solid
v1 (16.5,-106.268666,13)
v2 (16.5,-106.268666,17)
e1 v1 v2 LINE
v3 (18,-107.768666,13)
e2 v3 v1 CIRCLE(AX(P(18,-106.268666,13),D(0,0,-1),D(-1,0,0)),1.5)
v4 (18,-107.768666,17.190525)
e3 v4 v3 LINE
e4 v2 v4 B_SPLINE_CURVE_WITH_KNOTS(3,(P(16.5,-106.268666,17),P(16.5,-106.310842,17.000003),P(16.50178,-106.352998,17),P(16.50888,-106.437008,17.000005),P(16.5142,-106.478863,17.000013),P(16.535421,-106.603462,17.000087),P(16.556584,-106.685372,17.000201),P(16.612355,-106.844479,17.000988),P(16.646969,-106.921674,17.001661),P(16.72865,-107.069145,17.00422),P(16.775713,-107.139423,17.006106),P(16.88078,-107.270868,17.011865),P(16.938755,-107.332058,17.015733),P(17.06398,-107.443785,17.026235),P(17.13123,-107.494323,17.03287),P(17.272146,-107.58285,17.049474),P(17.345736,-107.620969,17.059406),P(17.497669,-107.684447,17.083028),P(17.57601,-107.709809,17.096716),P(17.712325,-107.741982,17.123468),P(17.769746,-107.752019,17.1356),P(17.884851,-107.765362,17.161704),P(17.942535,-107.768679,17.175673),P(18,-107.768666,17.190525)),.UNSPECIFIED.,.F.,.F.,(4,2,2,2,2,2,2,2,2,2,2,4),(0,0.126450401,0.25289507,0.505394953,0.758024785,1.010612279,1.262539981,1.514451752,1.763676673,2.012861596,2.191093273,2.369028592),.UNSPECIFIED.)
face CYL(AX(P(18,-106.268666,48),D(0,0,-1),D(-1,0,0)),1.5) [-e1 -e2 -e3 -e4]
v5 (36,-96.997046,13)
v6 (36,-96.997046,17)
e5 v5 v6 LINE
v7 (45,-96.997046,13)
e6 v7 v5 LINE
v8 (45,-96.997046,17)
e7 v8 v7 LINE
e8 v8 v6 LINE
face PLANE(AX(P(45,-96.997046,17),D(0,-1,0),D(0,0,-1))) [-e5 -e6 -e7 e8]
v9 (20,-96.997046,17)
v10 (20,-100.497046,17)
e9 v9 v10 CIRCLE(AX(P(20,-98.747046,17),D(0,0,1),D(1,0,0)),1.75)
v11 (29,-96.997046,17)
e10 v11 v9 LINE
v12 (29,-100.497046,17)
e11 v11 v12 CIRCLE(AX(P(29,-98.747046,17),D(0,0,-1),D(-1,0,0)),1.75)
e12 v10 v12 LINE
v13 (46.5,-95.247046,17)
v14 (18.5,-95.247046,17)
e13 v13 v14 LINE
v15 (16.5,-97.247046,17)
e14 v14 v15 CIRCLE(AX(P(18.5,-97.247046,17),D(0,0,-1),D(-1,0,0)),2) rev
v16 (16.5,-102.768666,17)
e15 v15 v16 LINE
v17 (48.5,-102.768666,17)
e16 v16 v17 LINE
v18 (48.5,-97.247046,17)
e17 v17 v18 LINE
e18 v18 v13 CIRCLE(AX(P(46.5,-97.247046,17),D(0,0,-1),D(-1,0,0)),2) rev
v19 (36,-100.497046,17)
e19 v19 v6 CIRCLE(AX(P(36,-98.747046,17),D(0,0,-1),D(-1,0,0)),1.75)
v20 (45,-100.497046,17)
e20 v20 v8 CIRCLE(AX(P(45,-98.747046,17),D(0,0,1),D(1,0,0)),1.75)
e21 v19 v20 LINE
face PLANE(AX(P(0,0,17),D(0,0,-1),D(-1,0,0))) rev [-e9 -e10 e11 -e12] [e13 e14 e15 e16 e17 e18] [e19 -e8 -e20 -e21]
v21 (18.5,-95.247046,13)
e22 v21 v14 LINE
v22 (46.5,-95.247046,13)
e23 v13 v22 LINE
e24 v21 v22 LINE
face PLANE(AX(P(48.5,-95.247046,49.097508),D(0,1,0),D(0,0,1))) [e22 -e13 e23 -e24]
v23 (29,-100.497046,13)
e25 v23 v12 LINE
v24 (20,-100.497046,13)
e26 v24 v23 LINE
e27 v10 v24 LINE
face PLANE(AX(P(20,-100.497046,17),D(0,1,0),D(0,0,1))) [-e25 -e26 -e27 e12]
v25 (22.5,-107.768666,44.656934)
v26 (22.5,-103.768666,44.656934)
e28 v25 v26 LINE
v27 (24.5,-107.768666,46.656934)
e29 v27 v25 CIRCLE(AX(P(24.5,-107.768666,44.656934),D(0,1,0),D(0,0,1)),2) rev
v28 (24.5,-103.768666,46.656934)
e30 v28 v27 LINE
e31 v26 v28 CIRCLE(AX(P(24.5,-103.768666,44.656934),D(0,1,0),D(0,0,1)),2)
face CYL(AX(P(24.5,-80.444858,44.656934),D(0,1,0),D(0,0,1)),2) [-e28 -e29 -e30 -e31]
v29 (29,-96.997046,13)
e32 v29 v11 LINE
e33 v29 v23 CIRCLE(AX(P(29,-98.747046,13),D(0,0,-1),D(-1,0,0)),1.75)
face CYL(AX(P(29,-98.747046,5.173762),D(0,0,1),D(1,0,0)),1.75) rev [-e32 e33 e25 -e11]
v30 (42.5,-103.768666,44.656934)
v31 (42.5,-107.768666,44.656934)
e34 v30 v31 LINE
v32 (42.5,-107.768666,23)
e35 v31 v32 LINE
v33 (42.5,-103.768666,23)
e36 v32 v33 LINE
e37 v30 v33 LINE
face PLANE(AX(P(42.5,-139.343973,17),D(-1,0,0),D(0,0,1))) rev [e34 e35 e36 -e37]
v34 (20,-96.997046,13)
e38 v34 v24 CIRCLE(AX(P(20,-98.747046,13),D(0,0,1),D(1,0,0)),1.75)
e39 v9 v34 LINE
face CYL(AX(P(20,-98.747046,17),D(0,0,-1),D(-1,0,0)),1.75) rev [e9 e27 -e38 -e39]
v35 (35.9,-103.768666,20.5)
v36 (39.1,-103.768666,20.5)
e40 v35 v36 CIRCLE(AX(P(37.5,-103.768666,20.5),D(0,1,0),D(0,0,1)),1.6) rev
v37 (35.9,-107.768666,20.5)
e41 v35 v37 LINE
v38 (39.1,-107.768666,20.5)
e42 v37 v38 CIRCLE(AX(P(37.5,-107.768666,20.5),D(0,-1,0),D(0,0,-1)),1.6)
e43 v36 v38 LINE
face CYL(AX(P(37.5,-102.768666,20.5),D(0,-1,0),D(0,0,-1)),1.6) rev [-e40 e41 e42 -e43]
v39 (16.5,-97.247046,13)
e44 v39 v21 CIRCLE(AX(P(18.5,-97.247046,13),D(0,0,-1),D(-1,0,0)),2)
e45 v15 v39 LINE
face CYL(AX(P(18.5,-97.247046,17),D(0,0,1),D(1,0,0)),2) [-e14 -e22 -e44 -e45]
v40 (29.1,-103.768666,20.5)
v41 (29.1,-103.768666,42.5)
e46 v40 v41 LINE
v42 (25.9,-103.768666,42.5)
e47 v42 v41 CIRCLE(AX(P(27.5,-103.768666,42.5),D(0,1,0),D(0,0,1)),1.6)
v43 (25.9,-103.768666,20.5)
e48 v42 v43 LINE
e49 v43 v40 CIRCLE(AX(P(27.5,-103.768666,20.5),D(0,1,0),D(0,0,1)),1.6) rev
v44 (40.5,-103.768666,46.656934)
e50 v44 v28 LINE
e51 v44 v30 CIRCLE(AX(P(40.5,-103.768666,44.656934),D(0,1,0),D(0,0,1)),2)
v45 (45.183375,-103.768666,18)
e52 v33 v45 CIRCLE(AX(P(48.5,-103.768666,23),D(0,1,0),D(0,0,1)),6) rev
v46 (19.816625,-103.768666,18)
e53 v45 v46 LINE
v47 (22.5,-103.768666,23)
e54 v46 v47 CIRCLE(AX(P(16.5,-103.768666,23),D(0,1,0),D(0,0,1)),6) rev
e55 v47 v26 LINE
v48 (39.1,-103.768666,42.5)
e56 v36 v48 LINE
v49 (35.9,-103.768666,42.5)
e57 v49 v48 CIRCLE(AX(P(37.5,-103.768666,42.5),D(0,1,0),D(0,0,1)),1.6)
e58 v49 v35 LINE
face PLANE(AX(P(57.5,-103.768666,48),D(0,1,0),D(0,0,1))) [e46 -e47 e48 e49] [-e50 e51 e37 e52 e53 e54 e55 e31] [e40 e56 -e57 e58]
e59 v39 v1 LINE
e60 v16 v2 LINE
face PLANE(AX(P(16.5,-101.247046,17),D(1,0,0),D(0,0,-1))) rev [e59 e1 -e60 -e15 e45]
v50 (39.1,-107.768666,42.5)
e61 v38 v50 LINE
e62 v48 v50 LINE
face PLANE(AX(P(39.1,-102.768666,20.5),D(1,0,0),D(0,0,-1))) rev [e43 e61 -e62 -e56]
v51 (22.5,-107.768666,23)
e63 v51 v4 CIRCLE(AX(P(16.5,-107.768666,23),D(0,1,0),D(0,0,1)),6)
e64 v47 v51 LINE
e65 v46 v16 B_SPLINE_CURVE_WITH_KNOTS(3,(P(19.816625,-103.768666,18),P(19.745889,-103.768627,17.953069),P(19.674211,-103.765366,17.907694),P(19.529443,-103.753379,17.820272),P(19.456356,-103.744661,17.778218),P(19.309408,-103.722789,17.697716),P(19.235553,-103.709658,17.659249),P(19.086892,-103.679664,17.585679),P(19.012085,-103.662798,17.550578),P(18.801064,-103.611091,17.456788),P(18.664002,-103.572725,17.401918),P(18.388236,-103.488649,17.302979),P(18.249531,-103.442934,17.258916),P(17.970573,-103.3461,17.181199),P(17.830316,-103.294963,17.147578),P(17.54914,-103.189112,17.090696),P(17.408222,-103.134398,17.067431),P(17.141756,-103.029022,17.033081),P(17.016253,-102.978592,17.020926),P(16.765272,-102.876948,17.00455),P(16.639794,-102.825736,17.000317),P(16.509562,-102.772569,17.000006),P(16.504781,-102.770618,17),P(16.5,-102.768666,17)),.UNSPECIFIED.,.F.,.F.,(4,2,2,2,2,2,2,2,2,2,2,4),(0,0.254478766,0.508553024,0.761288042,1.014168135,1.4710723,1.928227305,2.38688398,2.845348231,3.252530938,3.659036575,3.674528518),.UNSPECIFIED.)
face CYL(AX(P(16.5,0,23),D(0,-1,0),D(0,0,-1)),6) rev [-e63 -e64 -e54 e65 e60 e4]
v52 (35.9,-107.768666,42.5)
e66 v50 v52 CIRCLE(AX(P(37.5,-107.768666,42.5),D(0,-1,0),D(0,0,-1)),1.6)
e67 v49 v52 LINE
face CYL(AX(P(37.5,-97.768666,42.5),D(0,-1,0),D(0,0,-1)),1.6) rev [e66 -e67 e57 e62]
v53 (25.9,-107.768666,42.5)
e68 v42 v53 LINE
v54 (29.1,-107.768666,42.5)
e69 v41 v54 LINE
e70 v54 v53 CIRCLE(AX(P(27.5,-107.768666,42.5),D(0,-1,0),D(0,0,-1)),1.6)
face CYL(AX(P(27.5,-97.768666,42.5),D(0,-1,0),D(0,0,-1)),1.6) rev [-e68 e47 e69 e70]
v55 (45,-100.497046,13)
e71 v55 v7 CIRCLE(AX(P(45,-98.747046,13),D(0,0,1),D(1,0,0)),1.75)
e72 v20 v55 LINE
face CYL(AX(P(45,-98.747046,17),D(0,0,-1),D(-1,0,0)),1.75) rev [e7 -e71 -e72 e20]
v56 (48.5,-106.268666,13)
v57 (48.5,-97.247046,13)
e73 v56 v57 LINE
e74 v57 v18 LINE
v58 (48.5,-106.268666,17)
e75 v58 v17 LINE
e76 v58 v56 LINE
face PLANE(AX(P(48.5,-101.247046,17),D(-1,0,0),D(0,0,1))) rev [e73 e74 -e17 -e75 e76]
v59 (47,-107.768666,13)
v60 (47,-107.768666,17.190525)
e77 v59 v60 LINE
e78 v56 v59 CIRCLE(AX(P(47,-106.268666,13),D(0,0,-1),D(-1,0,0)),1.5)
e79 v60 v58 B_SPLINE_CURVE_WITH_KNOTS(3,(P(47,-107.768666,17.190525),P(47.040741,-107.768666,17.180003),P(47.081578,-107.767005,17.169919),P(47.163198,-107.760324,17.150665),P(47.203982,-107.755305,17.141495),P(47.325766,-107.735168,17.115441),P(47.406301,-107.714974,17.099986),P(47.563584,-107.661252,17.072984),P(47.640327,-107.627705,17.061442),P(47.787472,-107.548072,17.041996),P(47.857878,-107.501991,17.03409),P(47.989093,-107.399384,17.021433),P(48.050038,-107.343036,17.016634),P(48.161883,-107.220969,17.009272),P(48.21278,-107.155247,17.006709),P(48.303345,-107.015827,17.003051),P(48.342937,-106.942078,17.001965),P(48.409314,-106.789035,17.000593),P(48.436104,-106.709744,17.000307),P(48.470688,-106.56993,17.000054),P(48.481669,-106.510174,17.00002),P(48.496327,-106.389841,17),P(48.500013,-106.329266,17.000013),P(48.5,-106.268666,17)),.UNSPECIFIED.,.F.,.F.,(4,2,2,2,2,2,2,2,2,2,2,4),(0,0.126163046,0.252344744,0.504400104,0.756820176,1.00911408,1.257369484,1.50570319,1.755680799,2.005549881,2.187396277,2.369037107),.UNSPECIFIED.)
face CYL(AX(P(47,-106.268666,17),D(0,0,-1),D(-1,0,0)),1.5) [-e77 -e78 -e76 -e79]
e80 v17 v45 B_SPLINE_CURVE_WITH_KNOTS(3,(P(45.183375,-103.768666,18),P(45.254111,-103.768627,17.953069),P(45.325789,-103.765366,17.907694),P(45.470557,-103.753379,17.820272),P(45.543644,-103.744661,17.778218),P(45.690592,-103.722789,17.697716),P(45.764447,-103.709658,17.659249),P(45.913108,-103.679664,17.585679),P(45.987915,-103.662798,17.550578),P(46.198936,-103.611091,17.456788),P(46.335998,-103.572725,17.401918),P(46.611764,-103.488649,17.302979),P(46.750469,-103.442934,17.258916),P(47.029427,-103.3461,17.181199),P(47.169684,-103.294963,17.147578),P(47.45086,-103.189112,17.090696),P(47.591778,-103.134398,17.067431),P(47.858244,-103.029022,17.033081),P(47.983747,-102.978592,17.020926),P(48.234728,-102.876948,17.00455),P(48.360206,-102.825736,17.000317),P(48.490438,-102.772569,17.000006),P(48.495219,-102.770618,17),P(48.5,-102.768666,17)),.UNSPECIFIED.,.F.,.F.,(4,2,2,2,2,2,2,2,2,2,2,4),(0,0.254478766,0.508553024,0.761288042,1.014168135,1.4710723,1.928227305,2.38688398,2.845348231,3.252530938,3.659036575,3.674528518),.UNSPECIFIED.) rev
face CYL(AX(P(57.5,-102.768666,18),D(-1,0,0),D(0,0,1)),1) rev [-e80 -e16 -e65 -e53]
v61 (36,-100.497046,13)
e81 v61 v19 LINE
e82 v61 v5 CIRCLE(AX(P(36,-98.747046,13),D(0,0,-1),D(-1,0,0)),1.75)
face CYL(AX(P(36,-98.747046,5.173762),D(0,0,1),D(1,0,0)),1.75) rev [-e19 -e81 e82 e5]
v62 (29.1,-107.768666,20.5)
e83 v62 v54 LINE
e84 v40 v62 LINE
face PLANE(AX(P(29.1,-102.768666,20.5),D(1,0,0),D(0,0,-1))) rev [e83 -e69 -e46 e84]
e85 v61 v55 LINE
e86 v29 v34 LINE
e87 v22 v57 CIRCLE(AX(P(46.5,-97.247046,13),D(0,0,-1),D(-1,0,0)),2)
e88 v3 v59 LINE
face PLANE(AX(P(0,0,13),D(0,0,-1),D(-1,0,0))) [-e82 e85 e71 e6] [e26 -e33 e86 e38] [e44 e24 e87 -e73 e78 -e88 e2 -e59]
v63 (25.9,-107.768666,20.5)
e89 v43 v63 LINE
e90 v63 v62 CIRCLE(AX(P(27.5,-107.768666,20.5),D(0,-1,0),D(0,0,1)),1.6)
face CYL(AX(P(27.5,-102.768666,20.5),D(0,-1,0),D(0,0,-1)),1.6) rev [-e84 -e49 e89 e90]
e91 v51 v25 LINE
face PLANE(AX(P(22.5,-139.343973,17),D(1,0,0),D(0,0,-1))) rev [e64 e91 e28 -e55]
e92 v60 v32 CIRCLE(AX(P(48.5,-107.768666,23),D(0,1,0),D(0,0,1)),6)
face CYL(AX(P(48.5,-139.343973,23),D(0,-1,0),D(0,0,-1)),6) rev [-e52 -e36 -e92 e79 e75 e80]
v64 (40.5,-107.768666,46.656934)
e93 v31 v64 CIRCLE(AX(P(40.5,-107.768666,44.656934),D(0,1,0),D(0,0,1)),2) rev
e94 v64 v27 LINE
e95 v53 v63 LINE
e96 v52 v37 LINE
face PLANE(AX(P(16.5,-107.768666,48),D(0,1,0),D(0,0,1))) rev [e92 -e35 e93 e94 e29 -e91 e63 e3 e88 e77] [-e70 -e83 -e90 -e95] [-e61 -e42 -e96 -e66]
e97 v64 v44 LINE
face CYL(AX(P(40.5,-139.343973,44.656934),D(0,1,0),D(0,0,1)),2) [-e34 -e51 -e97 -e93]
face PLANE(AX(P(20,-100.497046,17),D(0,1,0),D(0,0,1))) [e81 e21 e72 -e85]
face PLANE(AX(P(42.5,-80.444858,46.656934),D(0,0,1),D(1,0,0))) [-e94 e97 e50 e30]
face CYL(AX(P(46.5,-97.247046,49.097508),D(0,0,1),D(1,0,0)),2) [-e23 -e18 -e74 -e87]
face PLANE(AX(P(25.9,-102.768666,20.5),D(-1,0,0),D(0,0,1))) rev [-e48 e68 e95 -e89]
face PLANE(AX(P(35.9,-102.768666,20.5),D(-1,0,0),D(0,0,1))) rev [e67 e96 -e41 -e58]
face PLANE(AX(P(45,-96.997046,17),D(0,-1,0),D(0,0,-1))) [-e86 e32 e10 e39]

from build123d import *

# Parameters (mm, degrees)
EXTRUDE_1_DEPTH           = 3
SKETCH_7_R                = 2.25
CUT_EXTRUDE_2_DEPTH       = 143.955430949
SKETCH_8_R                = 8
CUT_EXTRUDE_3_DEPTH       = 143.955430949
CUT_EXTRUDE_4_DEPTH       = 3
CUT_EXTRUDE_5_DEPTH       = 3
CUT_EXTRUDE_8_DEPTH       = 3
SKETCH_12_R               = 1.7
CUT_EXTRUDE_9_DEPTH       = 3
SKETCH_13_R               = 1.7
CUT_EXTRUDE_11_DEPTH      = 3
CUT_EXTRUDE_12_DEPTH      = 143.955430949
FILLET_1_R                = 2
FILLET_2_R                = 2
CUT_EXTRUDE_13_DEPTH      = 143.955430949
CUT_EXTRUDE_14_DEPTH      = 143.955430949
CUT_EXTRUDE_15_DEPTH      = 143.955430949
CUT_EXTRUDE_16_DEPTH      = 143.955430949
EXTRUDE_2_DEPTH           = 4
EXTRUDE_2_2_DEPTH         = 4
EXTRUDE_4_DEPTH           = 4
EXTRUDE_5_DEPTH           = 35
SKETCH_25_W               = 6
SKETCH_25_H               = 31
CUT_EXTRUDE_17_DEPTH      = 5
FILLET_3_R                = 6
FILLET_4_R                = 6
FILLET_5_R                = 1.5
FILLET_6_R                = 1.5
CUT_EXTRUDE_18_DEPTH      = 5
CUT_EXTRUDE_19_DEPTH      = 15
CUT_EXTRUDE_19_DEPTH_BACK = 95
SKETCH_27_W               = 31
SKETCH_27_H               = 1
FILLET_8_R                = 1
FILLET_9_R                = 1
FILLET_10_R               = 3
SKETCH_28_W               = 85
SKETCH_28_H               = 10.343066278
CUT_EXTRUDE_20_DEPTH      = 5
FILLET_12_R               = 3
FILLET_13_R               = 3
EXTRUDE_7_DEPTH           = 4
FILLET_14_R               = 2
FILLET_15_R               = 2
SKETCH_33_W               = 46.51678315
SKETCH_33_H               = 37.006685261
CUT_EXTRUDE_22_DEPTH      = 40
SKETCH_34_W               = 20
SKETCH_34_H               = 12
EXTRUDE_8_DEPTH           = 4
CUT_EXTRUDE_23_DEPTH      = 10
FILLET_17_R               = 2


# Read off the part's stored shape, not the designer's step: 切除-拉伸21
# Some blends are built 0.0001 mm under size
with BuildPart() as part:
    # 草图1 → 凸台-拉伸1 (new body)
    # profile 1 of 14: a face of its own
    with BuildSketch(Plane.XY):
        with BuildLine():
            Line((60, 106.603296002), (35.889163634, 121.664519159))
            Line((35.889163634, 121.664519159), (-35.889163634, 121.664519159))
            Line((-35.889163634, 121.664519159), (-60, 106.603296002))
            Line((-60, 106.603296002), (-60, 94.801892265))
            Line((-60, 94.801892265), (-45, 94.801892265))
            ThreePointArc((-45, 94.801892265), (-43.762563133, 94.289329132), (-43.25, 93.051892265))
            Line((-43.25, 93.051892265), (-37.75, 93.051892265))
            ThreePointArc((-37.75, 93.051892265), (-37.237436867, 94.289329132), (-36, 94.801892265))
            Line((-36, 94.801892265), (-21, 94.801892265))
            ThreePointArc((-21, 94.801892265), (-19.762563133, 94.289329132), (-19.25, 93.051892265))
            Line((-19.25, 93.051892265), (19.25, 93.051892265))
            ThreePointArc((19.25, 93.051892265), (19.762563133, 94.289329132), (21, 94.801892265))
            Line((21, 94.801892265), (36, 94.801892265))
            ThreePointArc((36, 94.801892265), (37.237436867, 94.289329132), (37.75, 93.051892265))
            Line((37.75, 93.051892265), (43.25, 93.051892265))
            ThreePointArc((43.25, 93.051892265), (43.762563133, 94.289329132), (45, 94.801892265))
            Line((45, 94.801892265), (60, 94.801892265))
            Line((60, 94.801892265), (60, 106.603296002))
        make_face()
    # profile 2 of 14: a face of its own
    with BuildSketch(Plane.XY):
        with BuildLine():
            Line((66.901694095, 102.292041372), (60, 106.603296002))
            Line((60, 106.603296002), (60, 94.801892265))
            ThreePointArc((60, 94.801892265), (61.237436867, 94.289329132), (61.75, 93.051892265))
            Line((61.75, 93.051892265), (66.901694095, 93.051892265))
            Line((66.901694095, 93.051892265), (66.901694095, 102.292041372))
        make_face()
    # profile 3 of 14: a face of its own
    with BuildSketch(Plane.XY):
        with BuildLine():
            Line((-60, 94.801892265), (-60, 106.603296002))
            Line((-60, 106.603296002), (-66.901694095, 102.292041372))
            Line((-66.901694095, 102.292041372), (-66.901694095, 93.051892265))
            Line((-66.901694095, 93.051892265), (-61.75, 93.051892265))
            ThreePointArc((-61.75, 93.051892265), (-61.237436867, 94.289329132), (-60, 94.801892265))
        make_face()
    # profile 4 of 14: a face of its own
    with BuildSketch(Plane.XY):
        with BuildLine():
            Line((66.901694095, 63.051892265), (66.901694095, 93.051892265))
            Line((66.901694095, 93.051892265), (61.75, 93.051892265))
            ThreePointArc((61.75, 93.051892265), (61.237436867, 91.814455398), (60, 91.301892265))
            Line((60, 91.301892265), (60, 64.801892265))
            ThreePointArc((60, 64.801892265), (61.237436867, 64.289329132), (61.75, 63.051892265))
            Line((61.75, 63.051892265), (66.901694095, 63.051892265))
        make_face()
    # profile 5 of 14: a face of its own
    with BuildSketch(Plane.XY):
        with BuildLine():
            Line((-61.75, 93.051892265), (-66.901694095, 93.051892265))
            Line((-66.901694095, 93.051892265), (-66.901694095, 63.051892265))
            Line((-66.901694095, 63.051892265), (-61.75, 63.051892265))
            ThreePointArc((-61.75, 63.051892265), (-61.237436867, 64.289329132), (-60, 64.801892265))
            Line((-60, 64.801892265), (-60, 91.301892265))
            ThreePointArc((-60, 91.301892265), (-61.237436867, 91.814455398), (-61.75, 93.051892265))
        make_face()
    # profile 6 of 14: a face of its own
    with BuildSketch(Plane.XY):
        with BuildLine():
            Line((66.901694095, 52.870133869), (66.901694095, 63.051892265))
            Line((66.901694095, 63.051892265), (61.75, 63.051892265))
            ThreePointArc((61.75, 63.051892265), (61.237436867, 61.814455398), (60, 61.301892265))
            Line((60, 61.301892265), (60, 31.261343001))
            Line((60, 31.261343001), (75, 31.261343001))
            Line((75, 31.261343001), (75, 40.933889795))
            ThreePointArc((75, 40.933889795), (69.117351927, 45.658052319), (66.901694095, 52.870133869))
        make_face()
    # profile 7 of 14: a face of its own
    with BuildSketch(Plane.XY):
        with BuildLine():
            Line((60, 64.801892265), (60, 91.301892265))
            Line((60, 91.301892265), (45, 91.301892265))
            ThreePointArc((45, 91.301892265), (43.762563133, 91.814455398), (43.25, 93.051892265))
            Line((43.25, 93.051892265), (37.75, 93.051892265))
            ThreePointArc((37.75, 93.051892265), (37.237436867, 91.814455398), (36, 91.301892265))
            Line((36, 91.301892265), (21, 91.301892265))
            ThreePointArc((21, 91.301892265), (19.762563133, 91.814455398), (19.25, 93.051892265))
            Line((19.25, 93.051892265), (-19.25, 93.051892265))
            ThreePointArc((-19.25, 93.051892265), (-19.762563133, 91.814455398), (-21, 91.301892265))
            Line((-21, 91.301892265), (-36, 91.301892265))
            ThreePointArc((-36, 91.301892265), (-37.237436867, 91.814455398), (-37.75, 93.051892265))
            Line((-37.75, 93.051892265), (-43.25, 93.051892265))
            ThreePointArc((-43.25, 93.051892265), (-43.762563133, 91.814455398), (-45, 91.301892265))
            Line((-45, 91.301892265), (-60, 91.301892265))
            Line((-60, 91.301892265), (-60, 64.801892265))
            Line((-60, 64.801892265), (-45, 64.801892265))
            ThreePointArc((-45, 64.801892265), (-43.762563133, 64.289329132), (-43.25, 63.051892265))
            Line((-43.25, 63.051892265), (-37.75, 63.051892265))
            ThreePointArc((-37.75, 63.051892265), (-37.237436867, 64.289329132), (-36, 64.801892265))
            Line((-36, 64.801892265), (-21, 64.801892265))
            ThreePointArc((-21, 64.801892265), (-19.762563133, 64.289329132), (-19.25, 63.051892265))
            Line((-19.25, 63.051892265), (19.25, 63.051892265))
            ThreePointArc((19.25, 63.051892265), (19.762563133, 64.289329132), (21, 64.801892265))
            Line((21, 64.801892265), (36, 64.801892265))
            ThreePointArc((36, 64.801892265), (37.237436867, 64.289329132), (37.75, 63.051892265))
            Line((37.75, 63.051892265), (43.25, 63.051892265))
            ThreePointArc((43.25, 63.051892265), (43.762563133, 64.289329132), (45, 64.801892265))
            Line((45, 64.801892265), (60, 64.801892265))
        make_face()
    # profile 8 of 14: a face of its own
    with BuildSketch(Plane.XY):
        with BuildLine():
            Line((-61.75, 63.051892265), (-66.901694095, 63.051892265))
            Line((-66.901694095, 63.051892265), (-66.901694095, 52.870133869))
            ThreePointArc((-66.901694095, 52.870133869), (-69.117351927, 45.658052319), (-75, 40.933889795))
            Line((-75, 40.933889795), (-75, 31.261343001))
            Line((-75, 31.261343001), (-60, 31.261343001))
            Line((-60, 31.261343001), (-60, 61.301892265))
            ThreePointArc((-60, 61.301892265), (-61.237436867, 61.814455398), (-61.75, 63.051892265))
        make_face()
    # profile 9 of 14: a face of its own
    with BuildSketch(Plane.XY):
        with BuildLine():
            Line((60, 31.261343001), (60, 61.301892265))
            Line((60, 61.301892265), (45, 61.301892265))
            ThreePointArc((45, 61.301892265), (43.762563133, 61.814455398), (43.25, 63.051892265))
            Line((43.25, 63.051892265), (37.75, 63.051892265))
            ThreePointArc((37.75, 63.051892265), (37.237436867, 61.814455398), (36, 61.301892265))
            Line((36, 61.301892265), (21, 61.301892265))
            ThreePointArc((21, 61.301892265), (19.762563133, 61.814455398), (19.25, 63.051892265))
            Line((19.25, 63.051892265), (-19.25, 63.051892265))
            ThreePointArc((-19.25, 63.051892265), (-19.762563133, 61.814455398), (-21, 61.301892265))
            Line((-21, 61.301892265), (-36, 61.301892265))
            ThreePointArc((-36, 61.301892265), (-37.237436867, 61.814455398), (-37.75, 63.051892265))
            Line((-37.75, 63.051892265), (-43.25, 63.051892265))
            ThreePointArc((-43.25, 63.051892265), (-43.762563133, 61.814455398), (-45, 61.301892265))
            Line((-45, 61.301892265), (-60, 61.301892265))
            Line((-60, 61.301892265), (-60, 31.261343001))
            Line((-60, 31.261343001), (60, 31.261343001))
        make_face()
    # profile 10 of 14: a face of its own
    with BuildSketch(Plane.XY):
        with BuildLine():
            Line((60, -58.312864289), (60, 23.940028391))
            Line((60, 23.940028391), (-60, 23.940028391))
            Line((-60, 23.940028391), (-60, -58.312864289))
            Line((-60, -58.312864289), (-45, -58.312864289))
            ThreePointArc((-45, -58.312864289), (-43.25, -60.062864289), (-45, -61.812864289))
            Line((-45, -61.812864289), (-60, -61.812864289))
            Line((-60, -61.812864289), (-60, -88.312864289))
            Line((-60, -88.312864289), (-45, -88.312864289))
            ThreePointArc((-45, -88.312864289), (-43.25, -90.062864289), (-45, -91.812864289))
            Line((-45, -91.812864289), (-60, -91.812864289))
            Line((-60, -91.812864289), (-60, -111.849967256))
            Line((-60, -111.849967256), (-38.845469114, -105.590576733))
            ThreePointArc((-38.845469114, -105.590576733), (-36.037784492, -104.975210108), (-33.17088573, -104.768665882))
            Line((-33.17088573, -104.768665882), (33.17088573, -104.768665882))
            ThreePointArc((33.17088573, -104.768665882), (36.037784492, -104.975210108), (38.845469114, -105.590576733))
            Line((38.845469114, -105.590576733), (60, -111.849967256))
            Line((60, -111.849967256), (60, -91.812864289))
            Line((60, -91.812864289), (45, -91.812864289))
            ThreePointArc((45, -91.812864289), (43.762563133, -91.300301156), (43.25, -90.062864289))
            ThreePointArc((43.25, -90.062864289), (43.762563133, -88.825427422), (45, -88.312864289))
            Line((45, -88.312864289), (60, -88.312864289))
            Line((60, -88.312864289), (60, -61.812864289))
            Line((60, -61.812864289), (45, -61.812864289))
            ThreePointArc((45, -61.812864289), (43.762563133, -61.300301156), (43.25, -60.062864289))
            ThreePointArc((43.25, -60.062864289), (43.762563133, -58.825427422), (45, -58.312864289))
            Line((45, -58.312864289), (60, -58.312864289))
        make_face()
        with BuildLine():
            ThreePointArc((-21, -88.312864289), (-19.762563133, -88.825427422), (-19.25, -90.062864289))
            ThreePointArc((-19.25, -90.062864289), (-19.762563133, -91.300301156), (-21, -91.812864289))
            Line((-21, -91.812864289), (-36, -91.812864289))
            ThreePointArc((-36, -91.812864289), (-37.75, -90.062864289), (-36, -88.312864289))
            Line((-36, -88.312864289), (-21, -88.312864289))
        make_face(mode=Mode.SUBTRACT)
        with BuildLine():
            ThreePointArc((-21, -58.312864289), (-19.762563133, -58.825427422), (-19.25, -60.062864289))
            ThreePointArc((-19.25, -60.062864289), (-19.762563133, -61.300301156), (-21, -61.812864289))
            Line((-21, -61.812864289), (-36, -61.812864289))
            ThreePointArc((-36, -61.812864289), (-37.75, -60.062864289), (-36, -58.312864289))
            Line((-36, -58.312864289), (-21, -58.312864289))
        make_face(mode=Mode.SUBTRACT)
        with BuildLine():
            ThreePointArc((36, -88.312864289), (37.237436867, -88.825427422), (37.75, -90.062864289))
            ThreePointArc((37.75, -90.062864289), (37.237436867, -91.300301156), (36, -91.812864289))
            Line((36, -91.812864289), (21, -91.812864289))
            ThreePointArc((21, -91.812864289), (19.762563133, -91.300301156), (19.25, -90.062864289))
            ThreePointArc((19.25, -90.062864289), (19.762563133, -88.825427422), (21, -88.312864289))
            Line((21, -88.312864289), (36, -88.312864289))
        make_face(mode=Mode.SUBTRACT)
        with BuildLine():
            ThreePointArc((36, -58.312864289), (37.237436867, -58.825427422), (37.75, -60.062864289))
            ThreePointArc((37.75, -60.062864289), (37.237436867, -61.300301156), (36, -61.812864289))
            Line((36, -61.812864289), (21, -61.812864289))
            ThreePointArc((21, -61.812864289), (19.762563133, -61.300301156), (19.25, -60.062864289))
            ThreePointArc((19.25, -60.062864289), (19.762563133, -58.825427422), (21, -58.312864289))
            Line((21, -58.312864289), (36, -58.312864289))
        make_face(mode=Mode.SUBTRACT)
    # profile 11 of 14: a face of its own
    with BuildSketch(Plane.XY):
        with BuildLine():
            Line((75, 23.940028391), (60, 23.940028391))
            Line((60, 23.940028391), (60, -58.312864289))
            ThreePointArc((60, -58.312864289), (61.237436867, -58.825427422), (61.75, -60.062864289))
            Line((61.75, -60.062864289), (67.402721334, -60.062864289))
            add(Edge.make_bspline(
                [(75, 10.562559835), (72.695878257, 1.907314233), (70.339582535, -13.372796253), (67.818206704, -36.939032951), (67.208860388, -51.77269444), (67.402721334, -60.062864289)],
                knots=[0, 0, 0, 0, 0.235246678, 0.40629419, 0.624108181, 0.624108181, 0.624108181, 0.624108181], degree=3))
            Line((75, 10.562559835), (75, 23.940028391))
        make_face()
    # profile 12 of 14: a face of its own
    with BuildSketch(Plane.XY):
        with BuildLine():
            Line((-60, -58.312864289), (-60, 23.940028391))
            Line((-60, 23.940028391), (-75, 23.940028391))
            Line((-75, 23.940028391), (-75, 10.562559835))
            add(Edge.make_bspline(
                [(-75, 10.562559835), (-72.695878257, 1.907314233), (-70.339582535, -13.372796253), (-67.818206704, -36.939032951), (-67.208860388, -51.77269444), (-67.402721334, -60.062864289)],
                knots=[0, 0, 0, 0, 0.235246678, 0.40629419, 0.624108181, 0.624108181, 0.624108181, 0.624108181], degree=3))
            add(Edge.make_bspline(
                [(-67.402721334, -60.062864289), (-67.560325872, -66.802583754), (-68.323504015, -76.843670093), (-70.154131955, -86.778530076), (-70.533712858, -90.062864289)],
                knots=[0.624108181, 0.624108181, 0.624108181, 0.624108181, 0.801186001, 0.888408652, 0.888408652, 0.888408652, 0.888408652], degree=3))
            add(Edge.make_bspline(
                [(-70.533712858, -90.062864289), (-71.019342956, -94.264792095), (-71.137422935, -98.476048206), (-70.1742624, -102.732794059)],
                knots=[0.888408652, 0.888408652, 0.888408652, 0.888408652, 1, 1, 1, 1], degree=3))
            Line((-70.1742624, -102.732794059), (-66.460817635, -113.761651372))
            Line((-66.460817635, -113.761651372), (-60, -111.849967256))
            Line((-60, -111.849967256), (-60, -91.812864289))
            ThreePointArc((-60, -91.812864289), (-61.75, -90.062864289), (-60, -88.312864289))
            Line((-60, -88.312864289), (-60, -61.812864289))
            ThreePointArc((-60, -61.812864289), (-61.75, -60.062864289), (-60, -58.312864289))
        make_face()
    # profile 13 of 14: a face of its own
    with BuildSketch(Plane.XY):
        with BuildLine():
            Line((67.402721334, -60.062864289), (61.75, -60.062864289))
            ThreePointArc((61.75, -60.062864289), (61.237436867, -61.300301156), (60, -61.812864289))
            Line((60, -61.812864289), (60, -88.312864289))
            ThreePointArc((60, -88.312864289), (61.237436867, -88.825427422), (61.75, -90.062864289))
            Line((61.75, -90.062864289), (70.533712858, -90.062864289))
            add(Edge.make_bspline(
                [(67.402721334, -60.062864289), (67.560325872, -66.802583754), (68.323504015, -76.843670093), (70.154131955, -86.778530076), (70.533712858, -90.062864289)],
                knots=[0.624108181, 0.624108181, 0.624108181, 0.624108181, 0.801186001, 0.888408652, 0.888408652, 0.888408652, 0.888408652], degree=3))
        make_face()
    # profile 14 of 14: a face of its own
    with BuildSketch(Plane.XY):
        with BuildLine():
            add(Edge.make_bspline(
                [(70.533712858, -90.062864289), (71.019342956, -94.264792095), (71.137422935, -98.476048206), (70.1742624, -102.732794059)],
                knots=[0.888408652, 0.888408652, 0.888408652, 0.888408652, 1, 1, 1, 1], degree=3))
            Line((70.533712858, -90.062864289), (61.75, -90.062864289))
            ThreePointArc((61.75, -90.062864289), (61.237436867, -91.300301156), (60, -91.812864289))
            Line((60, -91.812864289), (60, -111.849967256))
            Line((60, -111.849967256), (66.460817635, -113.761651372))
            Line((66.460817635, -113.761651372), (70.1742624, -102.732794059))
        make_face()
    extrude(amount=EXTRUDE_1_DEPTH)

    # 草图7 → 切除-拉伸2 (cut, through all)
    with BuildSketch(Plane(origin=(0, 0, 0), x_dir=(-1, 0, 0), z_dir=(0, 0, -1))):
        with Locations((-21, 41.261343001)):
            Circle(SKETCH_7_R)
        with Locations((21, 41.261343001)):
            Circle(SKETCH_7_R)
        with Locations((-21, 13.940028391)):
            Circle(SKETCH_7_R)
        with Locations((21, 13.940028391)):
            Circle(SKETCH_7_R)
    extrude(amount=-CUT_EXTRUDE_2_DEPTH, mode=Mode.SUBTRACT)

    # 草图8 → 切除-拉伸3 (cut, through all)
    with BuildSketch(Plane.XY.offset(3)):
        with BuildLine():
            Line((-12.621438714, -0.378557945), (-33.409010345, 20.409013685))
            ThreePointArc((-33.409010345, 20.409013685), (-36.590999434, 20.409013643), (-36.590999309, 17.227024553))
            Line((-36.590999309, 17.227024553), (-15.803426586, -3.560545984))
            ThreePointArc((-15.803426586, -3.560545984), (-12.621438673, -3.560545859), (-12.621438714, -0.378557945))
        make_face()
        with BuildLine():
            Line((33.410462056, 20.410458798), (12.572988319, -0.427010824))
            ThreePointArc((12.572988319, -0.427010824), (12.644570441, -3.584764993), (15.803045702, -3.56090242))
            Line((15.803045702, -3.56090242), (34.999999982, 15.636052774))
            Line((34.999999982, 15.636052774), (36.588086952, 17.224139819))
            ThreePointArc((36.588086952, 17.224139819), (36.592433993, 20.406111757), (33.410462056, 20.410458798))
        make_face()
        with BuildLine():
            Line((-15.803784812, -28.80377835), (-36.591002186, -49.590991619))
            ThreePointArc((-36.591002186, -49.590991619), (-36.591002403, -52.772972232), (-33.40902179, -52.772972254))
            Line((-33.40902179, -52.772972254), (-12.573723916, -31.937673388))
            ThreePointArc((-12.573723916, -31.937673388), (-12.64530628, -28.779915954), (-15.803784812, -28.80377835))
        make_face()
        with BuildLine():
            Line((36.590992666, -49.590989326), (15.803414627, -28.803411286))
            ThreePointArc((15.803414627, -28.803411286), (12.654338964, -28.769774302), (12.55344336, -31.917412949))
            Line((12.55344336, -31.917412949), (33.409007381, -52.772974779))
            ThreePointArc((33.409007381, -52.772974779), (36.590992708, -52.772974653), (36.590992666, -49.590989326))
        make_face()
        with Locations((-0.000368782, -16.182341354)):
            Circle(SKETCH_8_R)
    extrude(amount=-CUT_EXTRUDE_3_DEPTH, mode=Mode.SUBTRACT)

    # 草图9 → 切除-拉伸4 (cut)
    with BuildSketch(Plane.XY.offset(3)):
        with BuildLine():
            Line((55, -100.49704609), (20, -100.49704609))
            ThreePointArc((20, -100.49704609), (18.25, -98.74704609), (20, -96.99704609))
            Line((20, -96.99704609), (55, -96.99704609))
            ThreePointArc((55, -96.99704609), (56.75, -98.74704609), (55, -100.49704609))
        make_face()
        with BuildLine():
            Line((-55, -96.99704609), (-20, -96.99704609))
            ThreePointArc((-20, -96.99704609), (-18.25, -98.74704609), (-20, -100.49704609))
            Line((-20, -100.49704609), (-55, -100.49704609))
            ThreePointArc((-55, -100.49704609), (-56.75, -98.74704609), (-55, -96.99704609))
        make_face()
    extrude(amount=-CUT_EXTRUDE_4_DEPTH, mode=Mode.SUBTRACT)

    # 草图10 → 切除-拉伸5 (cut)
    with BuildSketch(Plane.XY.offset(3)):
        with BuildLine():
            Line((12.5, -80.062864289), (-12.5, -80.062864289))
            ThreePointArc((-12.5, -80.062864289), (-17.5, -75.062864289), (-12.5, -70.062864289))
            Line((-12.5, -70.062864289), (12.5, -70.062864289))
            ThreePointArc((12.5, -70.062864289), (17.5, -75.062864289), (12.5, -80.062864289))
        make_face()
    extrude(amount=-CUT_EXTRUDE_5_DEPTH, mode=Mode.SUBTRACT)

    # 草图11 → 切除-拉伸8 (cut)
    with BuildSketch(Plane.XY.offset(3)):
        with BuildLine():
            Line((15, 73.051892265), (-15, 73.051892265))
            ThreePointArc((-15, 73.051892265), (-20, 78.051892265), (-15, 83.051892265))
            Line((-15, 83.051892265), (15, 83.051892265))
            ThreePointArc((15, 83.051892265), (20, 78.051892265), (15, 73.051892265))
        make_face()
    extrude(amount=-CUT_EXTRUDE_8_DEPTH, mode=Mode.SUBTRACT)

    # 草图12 → 切除-拉伸9 (cut)
    with BuildSketch(Plane.XY.offset(3)):
        with Locations((0, 114.371786435)):
            Circle(SKETCH_12_R)
        with Locations((0, 98.371786435)):
            Circle(SKETCH_12_R)
        with Locations((8, 106.371786435)):
            Circle(SKETCH_12_R)
        with Locations((-8, 106.371786435)):
            Circle(SKETCH_12_R)
    extrude(amount=-CUT_EXTRUDE_9_DEPTH, mode=Mode.SUBTRACT)

    # 草图13 → 切除-拉伸11 (cut)
    with BuildSketch(Plane.XY.offset(3)):
        with Locations((0, -84.415765086)):
            Circle(SKETCH_13_R)
        with Locations((8, -92.415765086)):
            Circle(SKETCH_13_R)
        with Locations((0, -100.415765086)):
            Circle(SKETCH_13_R)
        with Locations((-8, -92.415765086)):
            Circle(SKETCH_13_R)
    extrude(amount=-CUT_EXTRUDE_11_DEPTH, mode=Mode.SUBTRACT)

    # 草图14 → 切除-拉伸12 (cut, through all)
    with BuildSketch(Plane.XY.offset(3)):
        with BuildLine():
            Line((-55.475501567, 8.919687236), (-55.475501567, -46.080312764))
            ThreePointArc((-55.475501567, -46.080312764), (-57.225501567, -47.830312764), (-58.975501567, -46.080312764))
            Line((-58.975501567, -46.080312764), (-58.975501567, 8.919687236))
            ThreePointArc((-58.975501567, 8.919687236), (-57.225501567, 10.669687236), (-55.475501567, 8.919687236))
        make_face()
        with BuildLine():
            Line((58.975501567, 8.919687236), (58.975501567, -46.080312764))
            ThreePointArc((58.975501567, -46.080312764), (57.225501567, -47.830312764), (55.475501567, -46.080312764))
            Line((55.475501567, -46.080312764), (55.475501567, 8.919687236))
            ThreePointArc((55.475501567, 8.919687236), (57.225501567, 10.669687236), (58.975501567, 8.919687236))
        make_face()
    extrude(amount=-CUT_EXTRUDE_12_DEPTH, mode=Mode.SUBTRACT)

    # 圆角1
    fillet_1_edges = [part.edges().sort_by_distance(p)[0] for p in [
        (75, 31.261343001, 1.5),
        (-75, 31.261343001, 1.5),
    ]]
    fillet(fillet_1_edges, radius=FILLET_1_R)

    # 圆角2
    fillet_2_edges = [part.edges().sort_by_distance(p)[0] for p in [
        (-75, 23.940028391, 1.5),
        (75, 23.940028391, 1.5),
    ]]
    fillet(fillet_2_edges, radius=FILLET_2_R)

    # 草图15 → 切除-拉伸13 (cut, through all)
    with BuildSketch(Plane(origin=(0, 0, 0), x_dir=(-1, 0, 0), z_dir=(0, 0, -1))):
        with BuildLine():
            Line((-61.184216401, 102.403501276), (-34.774762862, 118.900592756))
            ThreePointArc((-34.774762862, 118.900592756), (-32.70788159, 118.423097411), (-33.185376934, 116.356216138))
            Line((-33.185376934, 116.356216138), (-59.594830473, 99.859124658))
            ThreePointArc((-59.594830473, 99.859124658), (-61.661711746, 100.336620003), (-61.184216401, 102.403501276))
        make_face()
        with BuildLine():
            Line((59.594830473, 99.859124658), (33.185376934, 116.356216138))
            ThreePointArc((33.185376934, 116.356216138), (32.70788159, 118.423097411), (34.774762862, 118.900592756))
            Line((34.774762862, 118.900592756), (61.184216401, 102.403501276))
            ThreePointArc((61.184216401, 102.403501276), (61.661711746, 100.336620003), (59.594830473, 99.859124658))
        make_face()
    extrude(amount=-CUT_EXTRUDE_13_DEPTH, mode=Mode.SUBTRACT)

    # 草图16 → 切除-拉伸14 (cut, through all)
    with BuildSketch(Plane(origin=(0, 0, 0), x_dir=(-1, 0, 0), z_dir=(0, 0, -1))):
        with BuildLine():
            Line((-61.516979467, 42.761343001), (-32.056291893, 42.761343001))
            ThreePointArc((-32.056291893, 42.761343001), (-30.556291893, 41.261343001), (-32.056291893, 39.761343001))
            Line((-32.056291893, 39.761343001), (-61.516979467, 39.761343001))
            ThreePointArc((-61.516979467, 39.761343001), (-63.016979467, 41.261343001), (-61.516979467, 42.761343001))
        make_face()
        with BuildLine():
            Line((61.516979467, 39.761343001), (32.056291893, 39.761343001))
            ThreePointArc((32.056291893, 39.761343001), (30.556291893, 41.261343001), (32.056291893, 42.761343001))
            Line((32.056291893, 42.761343001), (61.516979467, 42.761343001))
            ThreePointArc((61.516979467, 42.761343001), (63.016979467, 41.261343001), (61.516979467, 39.761343001))
        make_face()
    extrude(amount=-CUT_EXTRUDE_14_DEPTH, mode=Mode.SUBTRACT)

    # 草图17 → 切除-拉伸15 (cut, through all)
    with BuildSketch(Plane(origin=(0, 0, 0), x_dir=(-1, 0, 0), z_dir=(0, 0, -1))):
        Polygon((-28.645414283, -8.118433382), (-34.644957411, -20.11751964), (-34.644957411, -29.946558382), (-37.580904049, -29.946558382), (-37.580904049, -20.11751964), (-43.580447177, -8.118433382), (-40.64450054, -8.118433382), (-36.176755657, -17.43687271), (-36.049105803, -17.43687271), (-31.58136092, -8.118433382), align=None)
    extrude(amount=-CUT_EXTRUDE_15_DEPTH, mode=Mode.SUBTRACT)

    # 草图18 → 切除-拉伸16 (cut, through all)
    with BuildSketch(Plane(origin=(0, 0, 0), x_dir=(-1, 0, 0), z_dir=(0, 0, -1))):
        Polygon((46.06697123, -29.087529791), (43.131024593, -29.087529791), (43.131024593, -18.875541487), (35.854982926, -18.875541487), (35.854982926, -29.087529791), (32.919036289, -29.087529791), (32.919036289, -7.259404791), (35.854982926, -7.259404791), (35.854982926, -16.450194265), (43.131024593, -16.450194265), (43.131024593, -7.259404791), (46.06697123, -7.259404791), align=None)
    extrude(amount=-CUT_EXTRUDE_16_DEPTH, mode=Mode.SUBTRACT)


with BuildPart() as body_2:
    # 草图19 → 凸台-拉伸2 (new body)
    with BuildSketch(Plane.XY.offset(13)):
        Polygon((16.5, -101.24704609), (16.5, -96.24704609), (48.5, -96.24704609), (48.5, -101.24704609), (48.5, -104.768665882), (16.5, -104.768665882), align=None)
        with BuildLine():
            Line((20, -100.49704609), (45, -100.49704609))
            ThreePointArc((45, -100.49704609), (46.75, -98.74704609), (45, -96.99704609))
            Line((45, -96.99704609), (20, -96.99704609))
            ThreePointArc((20, -96.99704609), (18.25, -98.74704609), (20, -100.49704609))
        make_face(mode=Mode.SUBTRACT)
    extrude(amount=EXTRUDE_2_DEPTH)



with BuildPart() as body_3:
    # 草图19 → Extrude 2 2 (new body)
    with BuildSketch(Plane.XY.offset(13)):
        Polygon((-16.5, -101.24704609), (-16.5, -104.768665882), (-48.5, -104.768665882), (-48.5, -101.24704609), (-48.5, -96.24704609), (-16.5, -96.24704609), align=None)
        with BuildLine():
            Line((-45, -96.99704609), (-20, -96.99704609))
            ThreePointArc((-20, -96.99704609), (-18.25, -98.74704609), (-20, -100.49704609))
            Line((-20, -100.49704609), (-45, -100.49704609))
            ThreePointArc((-45, -100.49704609), (-46.75, -98.74704609), (-45, -96.99704609))
        make_face(mode=Mode.SUBTRACT)
    extrude(amount=EXTRUDE_2_2_DEPTH)


with BuildPart() as body_2_1:
    add(body_2.part)

    add(body_3.part)  # 凸台-拉伸4 merges body 3
    # 草图21 → 凸台-拉伸4 (add)
    with BuildSketch(Plane.XY.offset(17)):
        with BuildLine():
            Line((-36, -96.99704609), (-29, -96.99704609))
            ThreePointArc((-29, -96.99704609), (-30.75, -98.74704609), (-29, -100.49704609))
            Line((-29, -100.49704609), (-36, -100.49704609))
            ThreePointArc((-36, -100.49704609), (-34.25, -98.74704609), (-36, -96.99704609))
        make_face()
        with BuildLine():
            Line((36, -100.49704609), (29, -100.49704609))
            ThreePointArc((29, -100.49704609), (30.75, -98.74704609), (29, -96.99704609))
            Line((29, -96.99704609), (36, -96.99704609))
            ThreePointArc((36, -96.99704609), (34.25, -98.74704609), (36, -100.49704609))
        make_face()
    extrude(amount=-EXTRUDE_4_DEPTH)

    # 草图23 → 凸台-拉伸5 (add)
    with BuildSketch(Plane.XY.offset(13)):
        Polygon((-48.5, -104.768665882), (-48.5, -107.768665882), (-16.5, -107.768665882), (-16.5, -104.768665882), (-16.5, -102.768665882), (-48.5, -102.768665882), align=None)
        Polygon((16.5, -104.768665882), (16.5, -107.768665882), (48.5, -107.768665882), (48.5, -104.768665882), (48.5, -102.768665882), (16.5, -102.768665882), align=None)
    extrude(amount=EXTRUDE_5_DEPTH)

    # 草图25 → 切除-拉伸17 (cut)
    with BuildSketch(Plane(origin=(0, -102.768665882, 0), x_dir=(1, 0, 0), z_dir=(0, 1, 0))):
        with Locations((-19.5, -32.5)):
            Rectangle(SKETCH_25_W, SKETCH_25_H)
        with Locations((-45.5, -32.5)):
            Rectangle(SKETCH_25_W, SKETCH_25_H)
        with Locations((19.5, -32.5)):
            Rectangle(SKETCH_25_W, SKETCH_25_H)
        with Locations((45.5, -32.5)):
            Rectangle(SKETCH_25_W, SKETCH_25_H)
    extrude(amount=-CUT_EXTRUDE_17_DEPTH, mode=Mode.SUBTRACT)

    # 圆角3
    fillet_3_edges = [body_2_1.edges().sort_by_distance(p)[0] for p in [
        (22.5, -105.268665882, 17),
        (42.5, -105.268665882, 17),
    ]]
    fillet(fillet_3_edges, radius=FILLET_3_R - 0.0001)  # a hair under: the kernel refuses the full size

    # 圆角4
    fillet_4_edges = [body_2_1.edges().sort_by_distance(p)[0] for p in [
        (-42.5, -105.268665882, 17),
        (-22.5, -105.268665882, 17),
    ]]
    fillet(fillet_4_edges, radius=FILLET_4_R - 0.0001)  # a hair under: the kernel refuses the full size

    # 圆角5
    fillet_5_edges = [body_2_1.edges().sort_by_distance(p)[0] for p in [
        (16.5, -96.24704609, 15),
        (48.5, -96.24704609, 15),
        (48.5, -107.768665882, 15),
        (16.5, -107.768665882, 15),
    ]]
    fillet(fillet_5_edges, radius=FILLET_5_R)

    # 圆角6
    fillet_6_edges = [body_2_1.edges().sort_by_distance(p)[0] for p in [
        (-48.5, -96.24704609, 15),
        (-16.5, -96.24704609, 15),
        (-16.5, -107.768665882, 15),
        (-48.5, -107.768665882, 15),
    ]]
    fillet(fillet_6_edges, radius=FILLET_6_R)

    # 草图26 → 切除-拉伸18 (cut)
    with BuildSketch(Plane.XZ.offset(107.768665882)):
        with BuildLine():
            Line((35.9, 20.5), (35.9, 32.5))
            ThreePointArc((35.9, 32.5), (37.5, 34.1), (39.1, 32.5))
            Line((39.1, 32.5), (39.1, 20.5))
            ThreePointArc((39.1, 20.5), (37.5, 18.9), (35.9, 20.5))
        make_face()
        with BuildLine():
            Line((25.9, 20.5), (25.9, 32.5))
            ThreePointArc((25.9, 32.5), (27.5, 34.1), (29.1, 32.5))
            Line((29.1, 32.5), (29.1, 20.5))
            ThreePointArc((29.1, 20.5), (27.5, 18.9), (25.9, 20.5))
        make_face()
        with BuildLine():
            Line((-29.1, 20.5), (-29.1, 32.5))
            ThreePointArc((-29.1, 32.5), (-27.5, 34.1), (-25.9, 32.5))
            Line((-25.9, 32.5), (-25.9, 20.5))
            ThreePointArc((-25.9, 20.5), (-27.5, 18.9), (-29.1, 20.5))
        make_face()
        with BuildLine():
            Line((-39.1, 20.5), (-39.1, 32.5))
            ThreePointArc((-39.1, 32.5), (-37.5, 34.1), (-35.9, 32.5))
            Line((-35.9, 32.5), (-35.9, 20.5))
            ThreePointArc((-35.9, 20.5), (-37.5, 18.9), (-39.1, 20.5))
        make_face()
    extrude(amount=-CUT_EXTRUDE_18_DEPTH, mode=Mode.SUBTRACT)

    # 草图27 → 切除-拉伸19 (cut, two sides: drawn at the far end of the back side and taken through both)
    with BuildSketch(Plane(origin=(42.5, 0, 0), x_dir=(0, 0, -1), z_dir=(1, 0, 0)).offset(-CUT_EXTRUDE_19_DEPTH_BACK)):
        with Locations((-32.5, -103.268665882)):
            Rectangle(SKETCH_27_W, SKETCH_27_H)
    extrude(amount=CUT_EXTRUDE_19_DEPTH + CUT_EXTRUDE_19_DEPTH_BACK, mode=Mode.SUBTRACT)

    # 圆角8
    # the kernel refuses this fillet: 1 mm, written as the material it adds along each edge
    with BuildSketch(Plane(origin=(-12.2501, -103.768665882, 17), x_dir=(0, 0, 1), z_dir=(-1, 0, 0))) as fillet_8_piece_1_section:
        with BuildLine():
            CenterArc((FILLET_8_R, FILLET_8_R), FILLET_8_R, 180, 90)
            Line((0, FILLET_8_R), (0, 0))
            Line((0, 0), (FILLET_8_R, 0))
        make_face()
    fillet_8_piece_1 = extrude(amount=40.4998, mode=Mode.PRIVATE)
    fillet_8_piece_1 = split(fillet_8_piece_1, bisect_by=Plane(origin=(-16.5, -103.768665882, 17), z_dir=(-1, 0, 0)), keep=Keep.TOP, mode=Mode.PRIVATE)
    fillet_8_piece_1 = split(fillet_8_piece_1, bisect_by=Plane(origin=(-48.5, -103.768665882, 17), z_dir=(1, 0, 0)), keep=Keep.TOP, mode=Mode.PRIVATE)
    fillet_8_piece_1 = fillet_8_piece_1 - Plane(origin=(-48.4999, -103.768665882, 22.9999), x_dir=(1, 0, 0), z_dir=(0, -1, 0)) * Cylinder(5.9999, 85, mode=Mode.PRIVATE)
    fillet_8_piece_1 = fillet_8_piece_1 - Plane(origin=(-16.5001, -103.768665882, 22.9999), x_dir=(-1, 0, 0), z_dir=(0, -1, 0)) * Cylinder(5.9999, 85, mode=Mode.PRIVATE)
    add(fillet_8_piece_1)

    # 圆角9
    fillet_9_edges = [body_2_1.edges().sort_by_distance(p)[0] for p in [
        (32.5, -103.768665882, 17),
    ]]
    fillet(fillet_9_edges, radius=FILLET_9_R)

    # 圆角10
    fillet_10_edges = [body_2_1.edges().sort_by_distance(p)[0] for p in [
        (-42.5, -105.768665882, 48),
        (-22.5, -105.768665882, 48),
    ]]
    fillet(fillet_10_edges, radius=FILLET_10_R)

    # 草图28 → 切除-拉伸20 (cut)
    with BuildSketch(Plane.XZ.offset(107.768665882)):
        with Locations((0, 42.828466861)):
            Rectangle(SKETCH_28_W, SKETCH_28_H)
    extrude(amount=-CUT_EXTRUDE_20_DEPTH, mode=Mode.SUBTRACT)

    # 圆角12
    fillet_12_edges = [body_2_1.edges().sort_by_distance(p)[0] for p in [
        (22.5, -105.768665882, 37.656933722),
        (42.5, -105.768665882, 37.656933722),
    ]]
    fillet(fillet_12_edges, radius=FILLET_12_R)

    # 圆角13
    fillet_13_edges = [body_2_1.edges().sort_by_distance(p)[0] for p in [
        (-22.5, -105.768665882, 37.656933722),
        (-42.5, -105.768665882, 37.656933722),
    ]]
    fillet(fillet_13_edges, radius=FILLET_13_R)

    # 草图32 → 凸台-拉伸7 (add)
    with BuildSketch(Plane(origin=(0, 0, 13), x_dir=(-1, 0, 0), z_dir=(0, 0, -1))):
        with BuildLine():
            Line((-48.5, -97.74704609), (-46.436140662, -97.74704609))
            ThreePointArc((-46.436140662, -97.74704609), (-45.810092587, -97.195836884), (-45, -96.99704609))
            Line((-45, -96.99704609), (-36, -96.99704609))
            ThreePointArc((-36, -96.99704609), (-35.189907413, -97.195836884), (-34.563859338, -97.74704609))
            Line((-34.563859338, -97.74704609), (-30.436140662, -97.74704609))
            ThreePointArc((-30.436140662, -97.74704609), (-29.810092587, -97.195836884), (-29, -96.99704609))
            Line((-29, -96.99704609), (-20, -96.99704609))
            ThreePointArc((-20, -96.99704609), (-19.189907413, -97.195836884), (-18.563859338, -97.74704609))
            Line((-18.563859338, -97.74704609), (-16.5, -97.74704609))
            Line((-16.5, -97.74704609), (-16.5, -95.24704609))
            Line((-16.5, -95.24704609), (-48.5, -95.24704609))
            Line((-48.5, -95.24704609), (-48.5, -97.74704609))
        make_face()
        with BuildLine():
            Line((18.563859338, -97.74704609), (16.5, -97.74704609))
            Line((16.5, -97.74704609), (16.5, -95.24704609))
            Line((16.5, -95.24704609), (48.5, -95.24704609))
            Line((48.5, -95.24704609), (48.5, -97.74704609))
            Line((48.5, -97.74704609), (46.436140662, -97.74704609))
            ThreePointArc((46.436140662, -97.74704609), (45.810092587, -97.195836884), (45, -96.99704609))
            Line((45, -96.99704609), (36, -96.99704609))
            ThreePointArc((36, -96.99704609), (35.189907413, -97.195836884), (34.563859338, -97.74704609))
            Line((34.563859338, -97.74704609), (30.436140662, -97.74704609))
            ThreePointArc((30.436140662, -97.74704609), (29.810092587, -97.195836884), (29, -96.99704609))
            Line((29, -96.99704609), (20, -96.99704609))
            ThreePointArc((20, -96.99704609), (19.189907413, -97.195836884), (18.563859338, -97.74704609))
        make_face()
    extrude(amount=-EXTRUDE_7_DEPTH)

    # 圆角14
    fillet_14_edges = [body_2_1.edges().sort_by_distance(p)[0] for p in [
        (48.5, -95.24704609, 15),
        (16.5, -95.24704609, 15),
    ]]
    fillet(fillet_14_edges, radius=FILLET_14_R)

    # 圆角15
    fillet_15_edges = [body_2_1.edges().sort_by_distance(p)[0] for p in [
        (-16.5, -95.24704609, 15),
        (-48.5, -95.24704609, 15),
    ]]
    fillet(fillet_15_edges, radius=FILLET_15_R)

    # 草图33 → 切除-拉伸22 (cut)
    with BuildSketch(Plane.XZ.offset(107.768665882)):
        with Locations((-31.993209744, 26.20711721)):
            Rectangle(SKETCH_33_W, SKETCH_33_H)
    extrude(amount=-CUT_EXTRUDE_22_DEPTH, mode=Mode.SUBTRACT)

    # 草图34 → 凸台-拉伸8 (add)
    with BuildSketch(Plane.XZ.offset(107.768665882)):
        with Locations((32.5, 40.656933722)):
            Rectangle(SKETCH_34_W, SKETCH_34_H)
    extrude(amount=-EXTRUDE_8_DEPTH)

    # 草图35 → 切除-拉伸23 (cut)
    with BuildSketch(Plane.XZ.offset(107.768665882)):
        with BuildLine():
            Line((39.1, 32.5), (39.1, 42.5))
            ThreePointArc((39.1, 42.5), (37.5, 44.1), (35.9, 42.5))
            Line((35.9, 42.5), (35.9, 32.5))
            ThreePointArc((35.9, 32.5), (37.5, 30.9), (39.1, 32.5))
        make_face()
        with BuildLine():
            Line((29.1, 32.5), (29.1, 42.5))
            ThreePointArc((29.1, 42.5), (27.5, 44.1), (25.9, 42.5))
            Line((25.9, 42.5), (25.9, 32.5))
            ThreePointArc((25.9, 32.5), (27.5, 30.9), (29.1, 32.5))
        make_face()
    extrude(amount=-CUT_EXTRUDE_23_DEPTH, mode=Mode.SUBTRACT)

    # 圆角17
    fillet_17_edges = [body_2_1.edges().sort_by_distance(p)[0] for p in [
        (42.5, -105.768665882, 46.656933722),
        (22.5, -105.768665882, 46.656933722),
    ]]
    fillet(fillet_17_edges, radius=FILLET_17_R)


solid = body_2_1.part
